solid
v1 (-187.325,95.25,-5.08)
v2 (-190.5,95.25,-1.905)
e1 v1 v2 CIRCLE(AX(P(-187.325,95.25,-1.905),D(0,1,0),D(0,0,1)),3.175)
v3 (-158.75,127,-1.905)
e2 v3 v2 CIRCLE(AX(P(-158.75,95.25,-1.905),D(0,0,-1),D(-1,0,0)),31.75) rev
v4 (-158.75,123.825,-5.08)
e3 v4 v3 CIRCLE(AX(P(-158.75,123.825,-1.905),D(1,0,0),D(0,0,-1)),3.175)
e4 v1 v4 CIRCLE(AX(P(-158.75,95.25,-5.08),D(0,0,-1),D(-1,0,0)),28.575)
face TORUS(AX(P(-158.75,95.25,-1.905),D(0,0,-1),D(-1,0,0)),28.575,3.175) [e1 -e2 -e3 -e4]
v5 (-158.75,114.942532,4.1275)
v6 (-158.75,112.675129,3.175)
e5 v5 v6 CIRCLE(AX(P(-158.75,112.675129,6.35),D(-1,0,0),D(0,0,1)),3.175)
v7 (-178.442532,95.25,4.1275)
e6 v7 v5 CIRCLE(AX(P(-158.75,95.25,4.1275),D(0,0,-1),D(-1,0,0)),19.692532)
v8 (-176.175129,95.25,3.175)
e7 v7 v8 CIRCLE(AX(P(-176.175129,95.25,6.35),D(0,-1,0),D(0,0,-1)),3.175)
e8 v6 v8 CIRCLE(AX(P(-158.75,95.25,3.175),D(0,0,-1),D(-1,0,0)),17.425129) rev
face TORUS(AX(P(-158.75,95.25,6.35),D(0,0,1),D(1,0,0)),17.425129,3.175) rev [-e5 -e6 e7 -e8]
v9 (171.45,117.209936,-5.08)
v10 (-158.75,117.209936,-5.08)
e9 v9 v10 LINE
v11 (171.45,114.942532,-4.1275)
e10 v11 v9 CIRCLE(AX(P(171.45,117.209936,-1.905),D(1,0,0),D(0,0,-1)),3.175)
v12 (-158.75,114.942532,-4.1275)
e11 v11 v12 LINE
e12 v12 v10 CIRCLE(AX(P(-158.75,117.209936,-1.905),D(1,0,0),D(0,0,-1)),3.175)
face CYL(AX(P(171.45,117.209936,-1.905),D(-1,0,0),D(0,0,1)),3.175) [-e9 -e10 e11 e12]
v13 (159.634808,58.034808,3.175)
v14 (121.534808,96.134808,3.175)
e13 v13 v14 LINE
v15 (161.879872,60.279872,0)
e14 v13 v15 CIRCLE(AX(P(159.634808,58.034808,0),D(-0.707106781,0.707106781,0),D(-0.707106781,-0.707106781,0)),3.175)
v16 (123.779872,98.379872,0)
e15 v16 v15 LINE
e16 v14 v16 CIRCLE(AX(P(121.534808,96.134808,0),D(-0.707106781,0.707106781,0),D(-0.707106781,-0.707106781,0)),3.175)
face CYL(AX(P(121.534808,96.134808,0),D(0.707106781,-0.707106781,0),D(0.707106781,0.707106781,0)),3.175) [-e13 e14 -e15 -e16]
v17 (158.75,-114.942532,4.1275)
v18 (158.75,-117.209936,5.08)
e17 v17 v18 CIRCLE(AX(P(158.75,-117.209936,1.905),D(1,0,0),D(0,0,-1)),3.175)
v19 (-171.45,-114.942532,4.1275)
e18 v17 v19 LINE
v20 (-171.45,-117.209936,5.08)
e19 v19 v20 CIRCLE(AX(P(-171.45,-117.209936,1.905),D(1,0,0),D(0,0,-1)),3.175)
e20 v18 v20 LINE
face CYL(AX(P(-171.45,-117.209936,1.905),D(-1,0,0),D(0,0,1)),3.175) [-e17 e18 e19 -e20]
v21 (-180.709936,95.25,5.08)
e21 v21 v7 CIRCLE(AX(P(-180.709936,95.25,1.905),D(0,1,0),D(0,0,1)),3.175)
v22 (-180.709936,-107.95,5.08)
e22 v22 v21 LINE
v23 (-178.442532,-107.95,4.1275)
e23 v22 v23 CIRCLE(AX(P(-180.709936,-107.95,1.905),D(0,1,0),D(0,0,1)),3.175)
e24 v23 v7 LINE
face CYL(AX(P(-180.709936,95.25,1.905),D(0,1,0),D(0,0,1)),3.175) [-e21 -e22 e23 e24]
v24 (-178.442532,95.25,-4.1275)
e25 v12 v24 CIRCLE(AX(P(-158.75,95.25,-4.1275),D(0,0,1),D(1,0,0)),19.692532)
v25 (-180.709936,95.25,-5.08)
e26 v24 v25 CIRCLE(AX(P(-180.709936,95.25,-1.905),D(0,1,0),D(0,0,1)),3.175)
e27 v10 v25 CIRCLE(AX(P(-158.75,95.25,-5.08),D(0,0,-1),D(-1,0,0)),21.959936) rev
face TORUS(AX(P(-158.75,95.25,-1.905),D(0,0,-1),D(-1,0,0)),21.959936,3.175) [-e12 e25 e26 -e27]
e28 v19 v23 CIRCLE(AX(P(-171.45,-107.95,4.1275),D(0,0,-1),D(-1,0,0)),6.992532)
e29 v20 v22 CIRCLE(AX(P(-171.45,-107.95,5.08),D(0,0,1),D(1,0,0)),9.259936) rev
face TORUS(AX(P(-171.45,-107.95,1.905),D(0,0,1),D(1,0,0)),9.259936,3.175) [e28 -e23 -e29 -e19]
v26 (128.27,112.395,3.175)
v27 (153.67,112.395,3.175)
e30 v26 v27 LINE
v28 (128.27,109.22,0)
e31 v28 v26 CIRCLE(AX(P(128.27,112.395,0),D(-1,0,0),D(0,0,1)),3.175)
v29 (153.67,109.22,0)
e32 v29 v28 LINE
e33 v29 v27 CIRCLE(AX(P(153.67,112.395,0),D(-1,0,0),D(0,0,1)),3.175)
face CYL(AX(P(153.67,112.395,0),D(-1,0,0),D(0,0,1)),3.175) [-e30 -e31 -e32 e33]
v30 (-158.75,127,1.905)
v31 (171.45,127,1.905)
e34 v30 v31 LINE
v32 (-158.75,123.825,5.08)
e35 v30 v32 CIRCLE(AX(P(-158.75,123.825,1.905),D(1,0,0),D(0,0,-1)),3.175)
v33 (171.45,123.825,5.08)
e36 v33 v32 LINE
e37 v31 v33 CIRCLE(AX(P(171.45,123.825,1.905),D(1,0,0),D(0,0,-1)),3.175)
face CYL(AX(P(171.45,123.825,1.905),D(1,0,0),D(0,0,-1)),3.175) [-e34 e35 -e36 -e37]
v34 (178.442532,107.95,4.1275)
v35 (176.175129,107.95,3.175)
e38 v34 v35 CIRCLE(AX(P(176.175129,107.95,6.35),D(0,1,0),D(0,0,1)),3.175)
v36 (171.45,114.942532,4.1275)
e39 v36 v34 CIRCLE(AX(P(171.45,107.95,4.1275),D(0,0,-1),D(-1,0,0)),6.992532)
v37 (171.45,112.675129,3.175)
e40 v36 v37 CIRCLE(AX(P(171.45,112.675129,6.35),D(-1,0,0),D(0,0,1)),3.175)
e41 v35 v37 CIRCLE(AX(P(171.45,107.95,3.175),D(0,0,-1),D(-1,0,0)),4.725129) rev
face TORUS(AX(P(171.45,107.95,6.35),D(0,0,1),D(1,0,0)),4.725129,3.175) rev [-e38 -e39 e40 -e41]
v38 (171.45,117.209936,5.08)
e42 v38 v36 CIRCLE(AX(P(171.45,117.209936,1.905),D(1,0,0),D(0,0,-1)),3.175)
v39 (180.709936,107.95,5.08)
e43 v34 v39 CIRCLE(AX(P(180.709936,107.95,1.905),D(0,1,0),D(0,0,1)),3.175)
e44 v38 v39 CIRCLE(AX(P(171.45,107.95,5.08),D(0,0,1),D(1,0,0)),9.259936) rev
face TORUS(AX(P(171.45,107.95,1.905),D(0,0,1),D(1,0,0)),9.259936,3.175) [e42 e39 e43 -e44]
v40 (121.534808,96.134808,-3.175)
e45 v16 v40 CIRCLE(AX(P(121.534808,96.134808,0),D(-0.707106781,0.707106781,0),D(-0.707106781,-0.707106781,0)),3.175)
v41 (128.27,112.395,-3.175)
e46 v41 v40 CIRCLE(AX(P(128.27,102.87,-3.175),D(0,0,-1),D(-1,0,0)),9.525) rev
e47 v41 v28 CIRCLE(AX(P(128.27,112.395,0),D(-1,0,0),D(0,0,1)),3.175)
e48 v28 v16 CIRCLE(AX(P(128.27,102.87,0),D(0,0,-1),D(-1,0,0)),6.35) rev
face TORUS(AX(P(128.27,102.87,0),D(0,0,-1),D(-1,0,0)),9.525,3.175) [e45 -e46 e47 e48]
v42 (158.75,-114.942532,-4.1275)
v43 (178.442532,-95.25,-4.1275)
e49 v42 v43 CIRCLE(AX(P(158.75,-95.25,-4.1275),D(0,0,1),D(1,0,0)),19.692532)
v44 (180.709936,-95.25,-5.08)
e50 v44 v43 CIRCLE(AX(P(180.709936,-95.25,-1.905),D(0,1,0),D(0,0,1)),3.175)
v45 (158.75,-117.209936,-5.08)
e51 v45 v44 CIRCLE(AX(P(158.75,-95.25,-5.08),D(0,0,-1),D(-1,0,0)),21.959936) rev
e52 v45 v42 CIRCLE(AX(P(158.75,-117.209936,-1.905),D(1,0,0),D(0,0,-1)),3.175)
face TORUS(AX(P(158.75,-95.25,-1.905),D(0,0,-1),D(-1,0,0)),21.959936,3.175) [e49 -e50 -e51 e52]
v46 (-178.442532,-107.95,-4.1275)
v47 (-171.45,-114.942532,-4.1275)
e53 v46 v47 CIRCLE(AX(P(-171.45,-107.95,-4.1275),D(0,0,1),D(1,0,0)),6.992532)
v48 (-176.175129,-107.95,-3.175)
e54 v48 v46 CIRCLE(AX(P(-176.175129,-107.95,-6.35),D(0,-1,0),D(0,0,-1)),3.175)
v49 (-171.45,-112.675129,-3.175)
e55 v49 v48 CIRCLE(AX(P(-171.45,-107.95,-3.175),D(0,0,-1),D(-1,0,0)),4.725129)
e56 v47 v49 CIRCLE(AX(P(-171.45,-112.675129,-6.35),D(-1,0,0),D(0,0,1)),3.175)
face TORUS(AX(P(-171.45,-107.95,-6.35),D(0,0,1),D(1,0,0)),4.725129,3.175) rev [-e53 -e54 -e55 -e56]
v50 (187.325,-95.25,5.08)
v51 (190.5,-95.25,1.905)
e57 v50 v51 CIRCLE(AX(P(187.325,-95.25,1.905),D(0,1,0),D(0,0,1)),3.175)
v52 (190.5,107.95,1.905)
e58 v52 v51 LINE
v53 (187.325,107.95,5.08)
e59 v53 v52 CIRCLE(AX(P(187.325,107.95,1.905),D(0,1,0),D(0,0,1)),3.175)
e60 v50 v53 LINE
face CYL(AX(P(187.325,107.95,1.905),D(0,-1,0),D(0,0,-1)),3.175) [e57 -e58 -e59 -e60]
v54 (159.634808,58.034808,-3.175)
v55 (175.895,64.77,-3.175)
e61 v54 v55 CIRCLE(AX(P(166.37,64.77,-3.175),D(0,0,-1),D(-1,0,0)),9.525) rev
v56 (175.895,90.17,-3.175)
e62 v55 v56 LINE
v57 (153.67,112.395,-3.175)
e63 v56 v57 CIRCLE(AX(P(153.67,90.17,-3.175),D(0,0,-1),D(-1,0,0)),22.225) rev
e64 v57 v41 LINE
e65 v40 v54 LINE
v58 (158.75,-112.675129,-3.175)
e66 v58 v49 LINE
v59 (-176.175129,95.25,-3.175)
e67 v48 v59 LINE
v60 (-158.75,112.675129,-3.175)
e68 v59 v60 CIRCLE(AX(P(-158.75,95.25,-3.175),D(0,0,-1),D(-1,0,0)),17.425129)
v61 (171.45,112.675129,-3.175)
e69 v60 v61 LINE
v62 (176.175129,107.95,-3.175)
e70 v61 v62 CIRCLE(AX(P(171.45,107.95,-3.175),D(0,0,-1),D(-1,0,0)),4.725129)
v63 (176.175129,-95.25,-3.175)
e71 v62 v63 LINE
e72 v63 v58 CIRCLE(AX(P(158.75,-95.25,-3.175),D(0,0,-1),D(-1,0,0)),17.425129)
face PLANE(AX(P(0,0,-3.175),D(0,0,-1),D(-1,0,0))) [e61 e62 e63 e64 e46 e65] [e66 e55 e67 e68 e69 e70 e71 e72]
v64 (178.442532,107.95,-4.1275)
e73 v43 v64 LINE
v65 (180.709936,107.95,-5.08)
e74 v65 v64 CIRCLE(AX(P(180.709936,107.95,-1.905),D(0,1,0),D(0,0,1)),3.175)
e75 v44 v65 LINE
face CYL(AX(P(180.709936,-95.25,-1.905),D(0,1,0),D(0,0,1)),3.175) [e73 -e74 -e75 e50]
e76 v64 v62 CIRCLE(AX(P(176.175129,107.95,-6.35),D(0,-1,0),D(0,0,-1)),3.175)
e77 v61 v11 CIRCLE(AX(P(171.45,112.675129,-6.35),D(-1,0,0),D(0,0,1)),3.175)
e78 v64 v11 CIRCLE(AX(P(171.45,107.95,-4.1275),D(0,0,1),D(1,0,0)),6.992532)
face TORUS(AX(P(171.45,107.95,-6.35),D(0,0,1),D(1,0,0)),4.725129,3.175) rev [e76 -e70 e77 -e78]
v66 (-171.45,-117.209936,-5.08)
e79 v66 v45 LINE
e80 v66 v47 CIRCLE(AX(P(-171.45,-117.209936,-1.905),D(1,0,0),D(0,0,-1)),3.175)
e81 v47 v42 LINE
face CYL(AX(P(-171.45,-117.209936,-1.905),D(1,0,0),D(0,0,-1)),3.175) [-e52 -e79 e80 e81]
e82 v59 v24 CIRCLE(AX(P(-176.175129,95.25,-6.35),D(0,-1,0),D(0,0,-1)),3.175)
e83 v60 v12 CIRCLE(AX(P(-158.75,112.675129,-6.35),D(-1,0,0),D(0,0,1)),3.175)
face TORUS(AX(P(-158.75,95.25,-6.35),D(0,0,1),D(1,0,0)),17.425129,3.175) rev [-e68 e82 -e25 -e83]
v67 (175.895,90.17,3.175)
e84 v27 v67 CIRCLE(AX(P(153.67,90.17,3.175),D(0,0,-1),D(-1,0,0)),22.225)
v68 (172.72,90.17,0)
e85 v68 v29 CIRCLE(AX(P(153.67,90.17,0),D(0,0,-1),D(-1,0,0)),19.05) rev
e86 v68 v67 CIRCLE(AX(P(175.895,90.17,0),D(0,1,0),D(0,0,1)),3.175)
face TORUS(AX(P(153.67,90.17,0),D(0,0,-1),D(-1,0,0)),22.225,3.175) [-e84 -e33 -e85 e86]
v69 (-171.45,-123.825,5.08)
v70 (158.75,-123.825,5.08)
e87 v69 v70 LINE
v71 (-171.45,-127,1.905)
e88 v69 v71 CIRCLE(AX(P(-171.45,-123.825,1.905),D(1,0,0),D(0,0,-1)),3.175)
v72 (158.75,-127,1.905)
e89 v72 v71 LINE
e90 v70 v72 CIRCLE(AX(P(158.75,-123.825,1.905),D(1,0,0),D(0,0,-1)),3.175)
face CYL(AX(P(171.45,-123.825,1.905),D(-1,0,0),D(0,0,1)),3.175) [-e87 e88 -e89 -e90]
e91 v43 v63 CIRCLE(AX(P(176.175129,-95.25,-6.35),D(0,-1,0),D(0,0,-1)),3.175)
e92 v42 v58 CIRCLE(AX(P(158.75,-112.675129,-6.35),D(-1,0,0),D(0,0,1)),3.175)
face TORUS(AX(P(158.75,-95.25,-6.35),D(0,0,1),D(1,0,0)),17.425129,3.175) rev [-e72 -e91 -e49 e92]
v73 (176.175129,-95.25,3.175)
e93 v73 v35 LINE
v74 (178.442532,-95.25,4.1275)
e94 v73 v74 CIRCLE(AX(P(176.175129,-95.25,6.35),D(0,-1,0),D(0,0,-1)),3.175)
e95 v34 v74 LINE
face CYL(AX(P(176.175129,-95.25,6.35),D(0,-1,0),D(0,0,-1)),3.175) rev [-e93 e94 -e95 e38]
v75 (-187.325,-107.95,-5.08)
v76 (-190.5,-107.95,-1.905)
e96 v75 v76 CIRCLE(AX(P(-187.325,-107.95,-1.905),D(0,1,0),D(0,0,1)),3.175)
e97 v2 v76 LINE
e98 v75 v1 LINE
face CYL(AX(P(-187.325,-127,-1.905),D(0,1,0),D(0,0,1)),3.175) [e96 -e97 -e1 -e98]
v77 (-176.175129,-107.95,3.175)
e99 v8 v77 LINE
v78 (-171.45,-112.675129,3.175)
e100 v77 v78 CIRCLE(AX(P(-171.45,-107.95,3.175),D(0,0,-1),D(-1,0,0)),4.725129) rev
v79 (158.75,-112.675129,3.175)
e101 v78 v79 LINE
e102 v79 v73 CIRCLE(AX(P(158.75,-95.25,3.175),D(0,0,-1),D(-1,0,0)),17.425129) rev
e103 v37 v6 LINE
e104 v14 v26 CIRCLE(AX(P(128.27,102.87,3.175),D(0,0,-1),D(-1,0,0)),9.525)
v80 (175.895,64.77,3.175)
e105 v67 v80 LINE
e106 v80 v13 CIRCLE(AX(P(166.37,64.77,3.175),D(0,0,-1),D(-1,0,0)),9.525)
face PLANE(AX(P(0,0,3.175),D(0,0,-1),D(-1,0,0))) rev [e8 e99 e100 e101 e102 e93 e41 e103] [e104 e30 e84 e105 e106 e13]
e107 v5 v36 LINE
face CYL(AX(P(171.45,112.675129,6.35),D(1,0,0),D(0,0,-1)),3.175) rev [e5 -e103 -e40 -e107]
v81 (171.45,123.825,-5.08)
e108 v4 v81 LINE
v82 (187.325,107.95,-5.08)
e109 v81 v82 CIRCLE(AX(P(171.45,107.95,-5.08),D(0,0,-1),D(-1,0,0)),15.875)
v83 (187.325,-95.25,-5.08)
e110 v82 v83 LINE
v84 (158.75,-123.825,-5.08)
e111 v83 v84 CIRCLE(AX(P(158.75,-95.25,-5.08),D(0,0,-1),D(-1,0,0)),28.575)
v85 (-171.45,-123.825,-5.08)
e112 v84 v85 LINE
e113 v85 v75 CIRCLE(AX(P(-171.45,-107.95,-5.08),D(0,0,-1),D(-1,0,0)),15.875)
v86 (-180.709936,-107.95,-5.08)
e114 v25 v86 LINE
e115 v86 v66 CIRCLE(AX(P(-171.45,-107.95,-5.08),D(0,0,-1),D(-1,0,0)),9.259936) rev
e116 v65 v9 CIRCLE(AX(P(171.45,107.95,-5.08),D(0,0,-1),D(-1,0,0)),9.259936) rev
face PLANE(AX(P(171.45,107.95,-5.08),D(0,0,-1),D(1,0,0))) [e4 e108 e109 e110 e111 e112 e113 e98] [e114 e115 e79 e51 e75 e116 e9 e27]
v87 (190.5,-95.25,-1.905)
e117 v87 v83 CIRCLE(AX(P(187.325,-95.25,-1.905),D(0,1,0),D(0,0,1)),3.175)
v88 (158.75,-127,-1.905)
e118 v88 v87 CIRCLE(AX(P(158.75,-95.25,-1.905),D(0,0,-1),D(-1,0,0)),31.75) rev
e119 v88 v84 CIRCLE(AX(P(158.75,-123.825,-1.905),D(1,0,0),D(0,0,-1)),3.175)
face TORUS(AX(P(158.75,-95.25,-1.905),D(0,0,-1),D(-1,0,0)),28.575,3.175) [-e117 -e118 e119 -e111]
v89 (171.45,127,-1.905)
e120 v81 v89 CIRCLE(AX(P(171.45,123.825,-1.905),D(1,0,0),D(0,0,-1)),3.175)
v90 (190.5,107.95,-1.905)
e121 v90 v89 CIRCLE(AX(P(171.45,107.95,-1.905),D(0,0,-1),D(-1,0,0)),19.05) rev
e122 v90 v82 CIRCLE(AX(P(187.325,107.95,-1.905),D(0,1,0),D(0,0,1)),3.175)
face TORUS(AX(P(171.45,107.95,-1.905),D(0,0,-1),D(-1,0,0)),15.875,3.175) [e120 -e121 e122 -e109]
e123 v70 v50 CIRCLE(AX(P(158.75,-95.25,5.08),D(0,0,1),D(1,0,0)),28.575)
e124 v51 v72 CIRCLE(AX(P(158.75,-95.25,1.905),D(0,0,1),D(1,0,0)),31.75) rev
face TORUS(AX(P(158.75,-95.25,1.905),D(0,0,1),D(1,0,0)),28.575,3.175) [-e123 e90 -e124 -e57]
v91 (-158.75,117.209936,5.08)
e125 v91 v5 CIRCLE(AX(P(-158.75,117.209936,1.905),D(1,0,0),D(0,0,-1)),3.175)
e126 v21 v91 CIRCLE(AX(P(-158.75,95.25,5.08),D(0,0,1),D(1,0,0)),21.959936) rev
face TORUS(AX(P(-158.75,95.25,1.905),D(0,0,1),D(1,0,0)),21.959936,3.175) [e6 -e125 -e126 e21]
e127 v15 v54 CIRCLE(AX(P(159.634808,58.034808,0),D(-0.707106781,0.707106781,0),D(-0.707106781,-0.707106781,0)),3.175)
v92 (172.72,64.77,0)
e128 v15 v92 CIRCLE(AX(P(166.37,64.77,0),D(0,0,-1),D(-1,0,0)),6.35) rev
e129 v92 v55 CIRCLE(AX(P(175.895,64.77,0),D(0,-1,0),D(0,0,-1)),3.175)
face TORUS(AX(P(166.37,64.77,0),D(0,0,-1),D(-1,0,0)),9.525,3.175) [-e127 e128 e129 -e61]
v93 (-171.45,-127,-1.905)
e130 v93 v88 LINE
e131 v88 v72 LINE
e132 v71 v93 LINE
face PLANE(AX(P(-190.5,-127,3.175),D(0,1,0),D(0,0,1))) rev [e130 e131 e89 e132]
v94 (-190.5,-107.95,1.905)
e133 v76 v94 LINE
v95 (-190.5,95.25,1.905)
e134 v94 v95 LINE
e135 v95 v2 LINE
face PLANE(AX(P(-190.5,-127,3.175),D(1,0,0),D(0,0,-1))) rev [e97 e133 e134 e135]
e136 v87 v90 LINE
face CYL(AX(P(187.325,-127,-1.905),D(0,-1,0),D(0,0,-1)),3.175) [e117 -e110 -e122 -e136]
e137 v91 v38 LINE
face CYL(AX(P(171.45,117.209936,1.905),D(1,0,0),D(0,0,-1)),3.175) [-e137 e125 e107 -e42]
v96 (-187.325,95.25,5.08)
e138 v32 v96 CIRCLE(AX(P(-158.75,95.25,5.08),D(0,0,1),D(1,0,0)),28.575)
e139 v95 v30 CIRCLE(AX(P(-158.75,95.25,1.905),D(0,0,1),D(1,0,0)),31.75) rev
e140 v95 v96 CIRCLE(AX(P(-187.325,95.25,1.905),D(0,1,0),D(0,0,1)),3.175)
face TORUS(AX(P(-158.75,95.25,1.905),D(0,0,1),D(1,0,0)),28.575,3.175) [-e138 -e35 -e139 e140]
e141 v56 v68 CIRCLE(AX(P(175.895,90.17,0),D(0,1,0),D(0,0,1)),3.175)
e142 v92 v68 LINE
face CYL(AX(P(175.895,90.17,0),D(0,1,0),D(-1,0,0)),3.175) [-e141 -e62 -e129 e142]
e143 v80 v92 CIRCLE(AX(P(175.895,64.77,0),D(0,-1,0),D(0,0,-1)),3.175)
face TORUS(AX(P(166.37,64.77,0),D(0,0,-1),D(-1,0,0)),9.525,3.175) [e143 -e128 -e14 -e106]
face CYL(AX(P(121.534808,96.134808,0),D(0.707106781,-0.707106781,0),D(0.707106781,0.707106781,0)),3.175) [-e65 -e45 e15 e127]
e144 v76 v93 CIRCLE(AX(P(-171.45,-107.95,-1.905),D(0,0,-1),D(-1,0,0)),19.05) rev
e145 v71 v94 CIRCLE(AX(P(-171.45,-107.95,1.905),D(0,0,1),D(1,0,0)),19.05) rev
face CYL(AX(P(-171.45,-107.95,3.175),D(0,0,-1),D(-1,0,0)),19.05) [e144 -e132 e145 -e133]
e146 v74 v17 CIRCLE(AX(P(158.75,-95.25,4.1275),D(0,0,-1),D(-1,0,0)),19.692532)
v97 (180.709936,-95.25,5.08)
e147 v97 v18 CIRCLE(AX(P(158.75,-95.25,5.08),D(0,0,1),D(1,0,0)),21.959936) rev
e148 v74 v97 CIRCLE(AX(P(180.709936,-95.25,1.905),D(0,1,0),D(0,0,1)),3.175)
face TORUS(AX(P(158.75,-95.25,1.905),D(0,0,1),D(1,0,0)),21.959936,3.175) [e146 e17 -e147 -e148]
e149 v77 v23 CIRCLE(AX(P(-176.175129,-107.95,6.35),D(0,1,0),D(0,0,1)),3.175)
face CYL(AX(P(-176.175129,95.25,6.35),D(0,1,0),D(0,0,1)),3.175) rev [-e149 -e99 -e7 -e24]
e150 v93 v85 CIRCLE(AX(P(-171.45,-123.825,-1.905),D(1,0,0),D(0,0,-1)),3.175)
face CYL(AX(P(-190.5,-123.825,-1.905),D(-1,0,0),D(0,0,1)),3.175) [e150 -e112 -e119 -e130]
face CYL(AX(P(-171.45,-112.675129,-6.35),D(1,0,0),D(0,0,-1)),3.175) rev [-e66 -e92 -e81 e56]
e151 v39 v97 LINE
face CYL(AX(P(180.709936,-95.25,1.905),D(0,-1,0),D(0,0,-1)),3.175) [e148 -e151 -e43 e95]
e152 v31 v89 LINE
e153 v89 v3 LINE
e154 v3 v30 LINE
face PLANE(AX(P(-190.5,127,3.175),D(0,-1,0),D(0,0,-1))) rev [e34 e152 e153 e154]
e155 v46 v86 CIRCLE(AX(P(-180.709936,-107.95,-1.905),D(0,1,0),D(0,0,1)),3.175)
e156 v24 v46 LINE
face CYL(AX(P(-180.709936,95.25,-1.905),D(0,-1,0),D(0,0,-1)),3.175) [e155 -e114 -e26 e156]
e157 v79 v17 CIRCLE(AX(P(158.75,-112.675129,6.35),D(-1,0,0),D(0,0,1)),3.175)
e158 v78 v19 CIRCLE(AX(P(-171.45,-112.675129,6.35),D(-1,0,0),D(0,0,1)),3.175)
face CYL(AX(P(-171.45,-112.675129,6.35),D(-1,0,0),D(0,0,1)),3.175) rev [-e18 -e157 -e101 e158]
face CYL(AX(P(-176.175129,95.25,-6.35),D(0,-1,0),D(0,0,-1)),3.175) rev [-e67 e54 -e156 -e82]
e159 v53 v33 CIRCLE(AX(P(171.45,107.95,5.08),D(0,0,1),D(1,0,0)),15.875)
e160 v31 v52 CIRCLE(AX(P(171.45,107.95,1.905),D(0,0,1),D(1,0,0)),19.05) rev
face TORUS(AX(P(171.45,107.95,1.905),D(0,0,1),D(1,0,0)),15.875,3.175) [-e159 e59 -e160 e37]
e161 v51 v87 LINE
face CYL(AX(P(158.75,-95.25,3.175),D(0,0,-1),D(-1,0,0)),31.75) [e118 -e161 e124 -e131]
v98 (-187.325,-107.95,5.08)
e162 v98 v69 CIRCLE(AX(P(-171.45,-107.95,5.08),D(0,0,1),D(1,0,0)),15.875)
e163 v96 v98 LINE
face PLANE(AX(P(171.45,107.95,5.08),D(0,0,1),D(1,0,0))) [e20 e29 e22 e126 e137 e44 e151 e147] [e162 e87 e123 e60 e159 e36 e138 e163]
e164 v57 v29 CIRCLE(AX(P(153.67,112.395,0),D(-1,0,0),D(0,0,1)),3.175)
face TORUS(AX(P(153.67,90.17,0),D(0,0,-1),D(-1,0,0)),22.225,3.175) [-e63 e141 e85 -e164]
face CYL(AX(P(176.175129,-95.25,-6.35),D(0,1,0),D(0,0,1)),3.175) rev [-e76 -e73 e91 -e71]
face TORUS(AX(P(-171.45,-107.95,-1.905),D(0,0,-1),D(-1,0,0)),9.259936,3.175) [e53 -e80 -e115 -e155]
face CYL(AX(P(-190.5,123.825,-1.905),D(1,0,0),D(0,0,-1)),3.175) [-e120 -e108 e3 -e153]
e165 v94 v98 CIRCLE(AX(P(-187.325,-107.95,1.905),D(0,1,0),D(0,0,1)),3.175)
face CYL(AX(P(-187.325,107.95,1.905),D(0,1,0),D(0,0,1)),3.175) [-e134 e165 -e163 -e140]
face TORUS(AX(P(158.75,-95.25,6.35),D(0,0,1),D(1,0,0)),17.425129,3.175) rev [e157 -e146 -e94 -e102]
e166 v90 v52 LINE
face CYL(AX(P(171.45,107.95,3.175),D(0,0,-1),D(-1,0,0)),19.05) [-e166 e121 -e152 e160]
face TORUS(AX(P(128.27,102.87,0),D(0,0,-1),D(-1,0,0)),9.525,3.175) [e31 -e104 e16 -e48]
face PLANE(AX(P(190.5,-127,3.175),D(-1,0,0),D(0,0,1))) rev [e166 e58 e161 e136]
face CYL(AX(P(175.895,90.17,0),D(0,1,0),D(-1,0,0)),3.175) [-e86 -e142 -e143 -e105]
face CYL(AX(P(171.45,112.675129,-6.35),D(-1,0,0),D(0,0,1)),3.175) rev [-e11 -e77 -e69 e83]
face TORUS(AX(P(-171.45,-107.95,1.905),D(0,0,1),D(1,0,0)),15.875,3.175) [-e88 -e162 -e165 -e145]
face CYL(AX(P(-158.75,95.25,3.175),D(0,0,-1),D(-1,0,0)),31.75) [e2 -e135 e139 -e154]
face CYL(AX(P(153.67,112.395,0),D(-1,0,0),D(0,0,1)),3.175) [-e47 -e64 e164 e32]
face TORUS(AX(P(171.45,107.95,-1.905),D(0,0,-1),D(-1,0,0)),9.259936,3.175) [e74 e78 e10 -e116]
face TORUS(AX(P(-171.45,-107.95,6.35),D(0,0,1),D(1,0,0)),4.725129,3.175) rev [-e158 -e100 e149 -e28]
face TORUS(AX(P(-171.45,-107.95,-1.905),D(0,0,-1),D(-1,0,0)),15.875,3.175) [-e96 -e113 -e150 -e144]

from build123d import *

# Parameters (mm, degrees)
SKETCH1_W           = 381
SKETCH1_H           = 254
BOSS_EXTRUDE1_DEPTH = 3.175
FILLET5_R           = 19.05
FILLET4_R           = 31.75
BOSS_EXTRUDE2_DEPTH = 1.905
CUT_EXTRUDE1_DEPTH  = 230.101276786
FILLET9_R           = 3.175
FILLET8_R           = 3.175


with BuildPart() as part:
    # Sketch1 → Boss-Extrude1 (new, symmetric)
    with BuildSketch(Plane.XY):
        Rectangle(SKETCH1_W, SKETCH1_H)
    extrude(amount=BOSS_EXTRUDE1_DEPTH, both=True)

    # Fillet5
    fillet5_edges = [part.edges().sort_by_distance(p)[0] for p in [
        (-190.5, -127, 0),
        (190.5, 127, 0),
    ]]
    fillet(fillet5_edges, radius=FILLET5_R)

    # Fillet4
    fillet4_edges = [part.edges().sort_by_distance(p)[0] for p in [
        (190.5, -127, 0),
        (-190.5, 127, 0),
    ]]
    fillet(fillet4_edges, radius=FILLET4_R)

    # Sketch2 → Boss-Extrude2 (add)
    with BuildSketch(Plane.XY.offset(3.175)):
        with BuildLine():
            Line((-171.45, -127), (158.75, -127))
            ThreePointArc((158.75, -127), (181.200640303, -117.700640303), (190.5, -95.25))
            Line((190.5, -95.25), (190.5, 107.95))
            ThreePointArc((190.5, 107.95), (184.920384182, 121.420384182), (171.45, 127))
            Line((171.45, 127), (-158.75, 127))
            ThreePointArc((-158.75, 127), (-181.200640303, 117.700640303), (-190.5, 95.25))
            Line((-190.5, 95.25), (-190.5, -107.95))
            ThreePointArc((-190.5, -107.95), (-184.920384182, -121.420384182), (-171.45, -127))
        make_face()
        with BuildLine():
            Line((-171.45, -114.3), (158.75, -114.3))
            ThreePointArc((158.75, -114.3), (172.220384182, -108.720384182), (177.8, -95.25))
            Line((177.8, -95.25), (177.8, 107.95))
            ThreePointArc((177.8, 107.95), (175.940128061, 112.440128061), (171.45, 114.3))
            Line((171.45, 114.3), (-158.75, 114.3))
            ThreePointArc((-158.75, 114.3), (-172.220384182, 108.720384182), (-177.8, 95.25))
            Line((-177.8, 95.25), (-177.8, -107.95))
            ThreePointArc((-177.8, -107.95), (-175.940128061, -112.440128061), (-171.45, -114.3))
        make_face(mode=Mode.SUBTRACT)
    boss_extrude2 = extrude(amount=BOSS_EXTRUDE2_DEPTH)

    # Mirror1: Boss-Extrude2 across plane
    add(boss_extrude2.mirror(Plane.XY))

    # Sketch3 → Cut-Extrude1 (cut, through all)
    with BuildSketch(Plane.XY.offset(3.175)):
        with BuildLine():
            Line((153.67, 109.22), (128.27, 109.22))
            ThreePointArc((128.27, 109.22), (122.403364969, 105.300039796), (123.779871939, 98.379871939))
            Line((123.779871939, 98.379871939), (161.879871939, 60.279871939))
            ThreePointArc((161.879871939, 60.279871939), (168.800039796, 58.903364969), (172.72, 64.77))
            Line((172.72, 64.77), (172.72, 90.17))
            ThreePointArc((172.72, 90.17), (167.140384182, 103.640384182), (153.67, 109.22))
        make_face()
    extrude(amount=-CUT_EXTRUDE1_DEPTH, mode=Mode.SUBTRACT)

    # Fillet9
    # the kernel refuses this fillet: 3.175 mm, written as the material it takes off along each edge
    with BuildSketch(Plane(origin=(153.67, 109.22, -3.175), x_dir=(0, 1, 0), z_dir=(-1, 0, 0)), Plane(origin=(172.72, 64.77, -3.175), x_dir=(1, 0, 0), z_dir=(0, 1, 0))) as fillet9_piece_1:
        with BuildLine():
            CenterArc((FILLET9_R, -FILLET9_R), FILLET9_R, 90, 90)
            Line((0, -FILLET9_R), (-FILLET9_R * 0.02, -FILLET9_R))
            Line((-FILLET9_R * 0.02, -FILLET9_R), (-FILLET9_R * 0.02, FILLET9_R * 0.02))
            Line((-FILLET9_R * 0.02, FILLET9_R * 0.02), (FILLET9_R, FILLET9_R * 0.02))
            Line((FILLET9_R, FILLET9_R * 0.02), (FILLET9_R, 0))
        make_face()
    extrude(amount=25.4, mode=Mode.SUBTRACT)
    with BuildSketch(Plane(origin=(128.27, 102.87, -3.175), x_dir=(0, 1, 0), z_dir=(1, 0, 0))) as fillet9_piece_2:
        with BuildLine():
            CenterArc((6.35 + FILLET9_R, FILLET9_R), FILLET9_R, 180, 90)
            Line((6.35, FILLET9_R), (6.35 - FILLET9_R * 0.02, FILLET9_R))
            Line((6.35 - FILLET9_R * 0.02, FILLET9_R), (6.35 - FILLET9_R * 0.02, -FILLET9_R * 0.02))
            Line((6.35 - FILLET9_R * 0.02, -FILLET9_R * 0.02), (6.35 + FILLET9_R, -FILLET9_R * 0.02))
            Line((6.35 + FILLET9_R, -FILLET9_R * 0.02), (6.35 + FILLET9_R, 0))
        make_face()
    revolve(axis=Axis((128.27, 102.87, -3.175), (0, 0, 1)), revolution_arc=135, mode=Mode.SUBTRACT)
    with BuildSketch(Plane(origin=(123.779871939, 98.379871939, -3.175), x_dir=(-0.7071067811865436, -0.7071067811865515, 0), z_dir=(0.7071067811865515, -0.7071067811865436, 0))) as fillet9_piece_3:
        with BuildLine():
            CenterArc((FILLET9_R, -FILLET9_R), FILLET9_R, 90, 90)
            Line((0, -FILLET9_R), (-FILLET9_R * 0.02, -FILLET9_R))
            Line((-FILLET9_R * 0.02, -FILLET9_R), (-FILLET9_R * 0.02, FILLET9_R * 0.02))
            Line((-FILLET9_R * 0.02, FILLET9_R * 0.02), (FILLET9_R, FILLET9_R * 0.02))
            Line((FILLET9_R, FILLET9_R * 0.02), (FILLET9_R, 0))
        make_face()
    extrude(amount=53.881536726, mode=Mode.SUBTRACT)
    with BuildSketch(Plane(origin=(166.37, 64.77, -3.175), x_dir=(-0.7071067811865369, -0.7071067811865581, 0), z_dir=(-0.7071067811865581, 0.7071067811865369, 0))) as fillet9_piece_4:
        with BuildLine():
            CenterArc((6.35 + FILLET9_R, FILLET9_R), FILLET9_R, 180, 90)
            Line((6.35, FILLET9_R), (6.35 - FILLET9_R * 0.02, FILLET9_R))
            Line((6.35 - FILLET9_R * 0.02, FILLET9_R), (6.35 - FILLET9_R * 0.02, -FILLET9_R * 0.02))
            Line((6.35 - FILLET9_R * 0.02, -FILLET9_R * 0.02), (6.35 + FILLET9_R, -FILLET9_R * 0.02))
            Line((6.35 + FILLET9_R, -FILLET9_R * 0.02), (6.35 + FILLET9_R, 0))
        make_face()
    revolve(axis=Axis((166.37, 64.77, -3.175), (0, 0, 1)), revolution_arc=135, mode=Mode.SUBTRACT)
    with BuildSketch(Plane(origin=(153.67, 90.17, -3.175), x_dir=(1, 0, 0), z_dir=(0, -1, 0))) as fillet9_piece_5:
        with BuildLine():
            CenterArc((19.05 + FILLET9_R, FILLET9_R), FILLET9_R, 180, 90)
            Line((19.05, FILLET9_R), (19.05 - FILLET9_R * 0.02, FILLET9_R))
            Line((19.05 - FILLET9_R * 0.02, FILLET9_R), (19.05 - FILLET9_R * 0.02, -FILLET9_R * 0.02))
            Line((19.05 - FILLET9_R * 0.02, -FILLET9_R * 0.02), (19.05 + FILLET9_R, -FILLET9_R * 0.02))
            Line((19.05 + FILLET9_R, -FILLET9_R * 0.02), (19.05 + FILLET9_R, 0))
        make_face()
    revolve(axis=Axis((153.67, 90.17, -3.175), (0, 0, 1)), revolution_arc=90, mode=Mode.SUBTRACT)
    with BuildSketch(Plane(origin=(153.67, 90.17, 3.175), x_dir=(1, 0, 0), z_dir=(0, -1, 0))) as fillet9_piece_6:
        with BuildLine():
            CenterArc((19.05 + FILLET9_R, -FILLET9_R), FILLET9_R, 90, 90)
            Line((19.05, -FILLET9_R), (19.05 - FILLET9_R * 0.02, -FILLET9_R))
            Line((19.05 - FILLET9_R * 0.02, -FILLET9_R), (19.05 - FILLET9_R * 0.02, FILLET9_R * 0.02))
            Line((19.05 - FILLET9_R * 0.02, FILLET9_R * 0.02), (19.05 + FILLET9_R, FILLET9_R * 0.02))
            Line((19.05 + FILLET9_R, FILLET9_R * 0.02), (19.05 + FILLET9_R, 0))
        make_face()
    revolve(axis=Axis((153.67, 90.17, 3.175), (0, 0, 1)), revolution_arc=90, mode=Mode.SUBTRACT)
    with BuildSketch(Plane(origin=(153.67, 109.22, 3.175), x_dir=(0, 1, 0), z_dir=(-1, 0, 0)), Plane(origin=(172.72, 64.77, 3.175), x_dir=(1, 0, 0), z_dir=(0, 1, 0))) as fillet9_piece_7:
        with BuildLine():
            CenterArc((FILLET9_R, FILLET9_R), FILLET9_R, 180, 90)
            Line((0, FILLET9_R), (-FILLET9_R * 0.02, FILLET9_R))
            Line((-FILLET9_R * 0.02, FILLET9_R), (-FILLET9_R * 0.02, -FILLET9_R * 0.02))
            Line((-FILLET9_R * 0.02, -FILLET9_R * 0.02), (FILLET9_R, -FILLET9_R * 0.02))
            Line((FILLET9_R, -FILLET9_R * 0.02), (FILLET9_R, 0))
        make_face()
    extrude(amount=25.4, mode=Mode.SUBTRACT)
    with BuildSketch(Plane(origin=(128.27, 102.87, 3.175), x_dir=(0, 1, 0), z_dir=(1, 0, 0))) as fillet9_piece_8:
        with BuildLine():
            CenterArc((6.35 + FILLET9_R, -FILLET9_R), FILLET9_R, 90, 90)
            Line((6.35, -FILLET9_R), (6.35 - FILLET9_R * 0.02, -FILLET9_R))
            Line((6.35 - FILLET9_R * 0.02, -FILLET9_R), (6.35 - FILLET9_R * 0.02, FILLET9_R * 0.02))
            Line((6.35 - FILLET9_R * 0.02, FILLET9_R * 0.02), (6.35 + FILLET9_R, FILLET9_R * 0.02))
            Line((6.35 + FILLET9_R, FILLET9_R * 0.02), (6.35 + FILLET9_R, 0))
        make_face()
    revolve(axis=Axis((128.27, 102.87, 3.175), (0, 0, 1)), revolution_arc=135, mode=Mode.SUBTRACT)
    with BuildSketch(Plane(origin=(123.779871939, 98.379871939, 3.175), x_dir=(-0.7071067811865436, -0.7071067811865515, 0), z_dir=(0.7071067811865515, -0.7071067811865436, 0))) as fillet9_piece_9:
        with BuildLine():
            CenterArc((FILLET9_R, FILLET9_R), FILLET9_R, 180, 90)
            Line((0, FILLET9_R), (-FILLET9_R * 0.02, FILLET9_R))
            Line((-FILLET9_R * 0.02, FILLET9_R), (-FILLET9_R * 0.02, -FILLET9_R * 0.02))
            Line((-FILLET9_R * 0.02, -FILLET9_R * 0.02), (FILLET9_R, -FILLET9_R * 0.02))
            Line((FILLET9_R, -FILLET9_R * 0.02), (FILLET9_R, 0))
        make_face()
    extrude(amount=53.881536726, mode=Mode.SUBTRACT)
    with BuildSketch(Plane(origin=(166.37, 64.77, 3.175), x_dir=(-0.7071067811865369, -0.7071067811865581, 0), z_dir=(-0.7071067811865581, 0.7071067811865369, 0))) as fillet9_piece_10:
        with BuildLine():
            CenterArc((6.35 + FILLET9_R, -FILLET9_R), FILLET9_R, 90, 90)
            Line((6.35, -FILLET9_R), (6.35 - FILLET9_R * 0.02, -FILLET9_R))
            Line((6.35 - FILLET9_R * 0.02, -FILLET9_R), (6.35 - FILLET9_R * 0.02, FILLET9_R * 0.02))
            Line((6.35 - FILLET9_R * 0.02, FILLET9_R * 0.02), (6.35 + FILLET9_R, FILLET9_R * 0.02))
            Line((6.35 + FILLET9_R, FILLET9_R * 0.02), (6.35 + FILLET9_R, 0))
        make_face()
    revolve(axis=Axis((166.37, 64.77, 3.175), (0, 0, 1)), revolution_arc=135, mode=Mode.SUBTRACT)
    with BuildSketch(Plane(origin=(171.45, 107.95, 5.08), x_dir=(1, 0, 0), z_dir=(0, -1, 0))) as fillet9_piece_11:
        with BuildLine():
            CenterArc((19.05 - FILLET9_R, -FILLET9_R), FILLET9_R, 0, 90)
            Line((19.05, -FILLET9_R), (19.05 + FILLET9_R * 0.02, -FILLET9_R))
            Line((19.05 + FILLET9_R * 0.02, -FILLET9_R), (19.05 + FILLET9_R * 0.02, FILLET9_R * 0.02))
            Line((19.05 + FILLET9_R * 0.02, FILLET9_R * 0.02), (19.05 - FILLET9_R, FILLET9_R * 0.02))
            Line((19.05 - FILLET9_R, FILLET9_R * 0.02), (19.05 - FILLET9_R, 0))
        make_face()
    revolve(axis=Axis((171.45, 107.95, 5.08), (0, 0, 1)), revolution_arc=90, mode=Mode.SUBTRACT)
    with BuildSketch(Plane(origin=(171.45, 127, 5.08), x_dir=(0, -1, 0), z_dir=(-1, 0, 0)), Plane(origin=(-171.45, -127, -5.08), x_dir=(0, 0, 1), z_dir=(1, 0, 0))) as fillet9_piece_12:
        with BuildLine():
            CenterArc((FILLET9_R, -FILLET9_R), FILLET9_R, 90, 90)
            Line((0, -FILLET9_R), (-FILLET9_R * 0.02, -FILLET9_R))
            Line((-FILLET9_R * 0.02, -FILLET9_R), (-FILLET9_R * 0.02, FILLET9_R * 0.02))
            Line((-FILLET9_R * 0.02, FILLET9_R * 0.02), (FILLET9_R, FILLET9_R * 0.02))
            Line((FILLET9_R, FILLET9_R * 0.02), (FILLET9_R, 0))
        make_face()
    extrude(amount=330.2, mode=Mode.SUBTRACT)
    with BuildSketch(Plane(origin=(-158.75, 95.25, 5.08), x_dir=(0, 1, 0), z_dir=(1, 0, 0))) as fillet9_piece_13:
        with BuildLine():
            CenterArc((31.75 - FILLET9_R, -FILLET9_R), FILLET9_R, 0, 90)
            Line((31.75, -FILLET9_R), (31.75 + FILLET9_R * 0.02, -FILLET9_R))
            Line((31.75 + FILLET9_R * 0.02, -FILLET9_R), (31.75 + FILLET9_R * 0.02, FILLET9_R * 0.02))
            Line((31.75 + FILLET9_R * 0.02, FILLET9_R * 0.02), (31.75 - FILLET9_R, FILLET9_R * 0.02))
            Line((31.75 - FILLET9_R, FILLET9_R * 0.02), (31.75 - FILLET9_R, 0))
        make_face()
    revolve(axis=Axis((-158.75, 95.25, 5.08), (0, 0, 1)), revolution_arc=90, mode=Mode.SUBTRACT)
    with BuildSketch(Plane(origin=(-190.5, 95.25, 5.08), x_dir=(1, 0, 0), z_dir=(0, -1, 0)), Plane(origin=(190.5, -95.25, 5.08), x_dir=(-1, 0, 0), z_dir=(0, 1, 0))) as fillet9_piece_14:
        with BuildLine():
            CenterArc((FILLET9_R, -FILLET9_R), FILLET9_R, 90, 90)
            Line((0, -FILLET9_R), (-FILLET9_R * 0.02, -FILLET9_R))
            Line((-FILLET9_R * 0.02, -FILLET9_R), (-FILLET9_R * 0.02, FILLET9_R * 0.02))
            Line((-FILLET9_R * 0.02, FILLET9_R * 0.02), (FILLET9_R, FILLET9_R * 0.02))
            Line((FILLET9_R, FILLET9_R * 0.02), (FILLET9_R, 0))
        make_face()
    extrude(amount=203.2, mode=Mode.SUBTRACT)
    with BuildSketch(Plane(origin=(-171.45, -107.95, 5.08), x_dir=(-1, 0, 0), z_dir=(0, 1, 0))) as fillet9_piece_15:
        with BuildLine():
            CenterArc((19.05 - FILLET9_R, -FILLET9_R), FILLET9_R, 0, 90)
            Line((19.05, -FILLET9_R), (19.05 + FILLET9_R * 0.02, -FILLET9_R))
            Line((19.05 + FILLET9_R * 0.02, -FILLET9_R), (19.05 + FILLET9_R * 0.02, FILLET9_R * 0.02))
            Line((19.05 + FILLET9_R * 0.02, FILLET9_R * 0.02), (19.05 - FILLET9_R, FILLET9_R * 0.02))
            Line((19.05 - FILLET9_R, FILLET9_R * 0.02), (19.05 - FILLET9_R, 0))
        make_face()
    revolve(axis=Axis((-171.45, -107.95, 5.08), (0, 0, 1)), revolution_arc=90, mode=Mode.SUBTRACT)
    with BuildSketch(Plane(origin=(-171.45, -127, 5.08), x_dir=(0, 0, -1), z_dir=(1, 0, 0)), Plane(origin=(171.45, 127, -5.08), x_dir=(0, -1, 0), z_dir=(-1, 0, 0))) as fillet9_piece_16:
        with BuildLine():
            CenterArc((FILLET9_R, FILLET9_R), FILLET9_R, 180, 90)
            Line((0, FILLET9_R), (-FILLET9_R * 0.02, FILLET9_R))
            Line((-FILLET9_R * 0.02, FILLET9_R), (-FILLET9_R * 0.02, -FILLET9_R * 0.02))
            Line((-FILLET9_R * 0.02, -FILLET9_R * 0.02), (FILLET9_R, -FILLET9_R * 0.02))
            Line((FILLET9_R, -FILLET9_R * 0.02), (FILLET9_R, 0))
        make_face()
    extrude(amount=330.2, mode=Mode.SUBTRACT)
    with BuildSketch(Plane(origin=(158.75, -95.25, 5.08), x_dir=(0, -1, 0), z_dir=(-1, 0, 0))) as fillet9_piece_17:
        with BuildLine():
            CenterArc((31.75 - FILLET9_R, -FILLET9_R), FILLET9_R, 0, 90)
            Line((31.75, -FILLET9_R), (31.75 + FILLET9_R * 0.02, -FILLET9_R))
            Line((31.75 + FILLET9_R * 0.02, -FILLET9_R), (31.75 + FILLET9_R * 0.02, FILLET9_R * 0.02))
            Line((31.75 + FILLET9_R * 0.02, FILLET9_R * 0.02), (31.75 - FILLET9_R, FILLET9_R * 0.02))
            Line((31.75 - FILLET9_R, FILLET9_R * 0.02), (31.75 - FILLET9_R, 0))
        make_face()
    revolve(axis=Axis((158.75, -95.25, 5.08), (0, 0, 1)), revolution_arc=90, mode=Mode.SUBTRACT)
    with BuildSketch(Plane(origin=(171.45, 107.95, -5.08), x_dir=(1, 0, 0), z_dir=(0, -1, 0))) as fillet9_piece_18:
        with BuildLine():
            CenterArc((19.05 - FILLET9_R, FILLET9_R), FILLET9_R, 270, 90)
            Line((19.05, FILLET9_R), (19.05 + FILLET9_R * 0.02, FILLET9_R))
            Line((19.05 + FILLET9_R * 0.02, FILLET9_R), (19.05 + FILLET9_R * 0.02, -FILLET9_R * 0.02))
            Line((19.05 + FILLET9_R * 0.02, -FILLET9_R * 0.02), (19.05 - FILLET9_R, -FILLET9_R * 0.02))
            Line((19.05 - FILLET9_R, -FILLET9_R * 0.02), (19.05 - FILLET9_R, 0))
        make_face()
    revolve(axis=Axis((171.45, 107.95, -5.08), (0, 0, 1)), revolution_arc=90, mode=Mode.SUBTRACT)
    with BuildSketch(Plane(origin=(190.5, -95.25, -5.08), x_dir=(-1, 0, 0), z_dir=(0, 1, 0)), Plane(origin=(-190.5, 95.25, -5.08), x_dir=(1, 0, 0), z_dir=(0, -1, 0))) as fillet9_piece_19:
        with BuildLine():
            CenterArc((FILLET9_R, FILLET9_R), FILLET9_R, 180, 90)
            Line((0, FILLET9_R), (-FILLET9_R * 0.02, FILLET9_R))
            Line((-FILLET9_R * 0.02, FILLET9_R), (-FILLET9_R * 0.02, -FILLET9_R * 0.02))
            Line((-FILLET9_R * 0.02, -FILLET9_R * 0.02), (FILLET9_R, -FILLET9_R * 0.02))
            Line((FILLET9_R, -FILLET9_R * 0.02), (FILLET9_R, 0))
        make_face()
    extrude(amount=203.2, mode=Mode.SUBTRACT)
    with BuildSketch(Plane(origin=(158.75, -95.25, -5.08), x_dir=(0, -1, 0), z_dir=(-1, 0, 0))) as fillet9_piece_20:
        with BuildLine():
            CenterArc((31.75 - FILLET9_R, FILLET9_R), FILLET9_R, 270, 90)
            Line((31.75, FILLET9_R), (31.75 + FILLET9_R * 0.02, FILLET9_R))
            Line((31.75 + FILLET9_R * 0.02, FILLET9_R), (31.75 + FILLET9_R * 0.02, -FILLET9_R * 0.02))
            Line((31.75 + FILLET9_R * 0.02, -FILLET9_R * 0.02), (31.75 - FILLET9_R, -FILLET9_R * 0.02))
            Line((31.75 - FILLET9_R, -FILLET9_R * 0.02), (31.75 - FILLET9_R, 0))
        make_face()
    revolve(axis=Axis((158.75, -95.25, -5.08), (0, 0, 1)), revolution_arc=90, mode=Mode.SUBTRACT)
    with BuildSketch(Plane(origin=(-171.45, -107.95, -5.08), x_dir=(-1, 0, 0), z_dir=(0, 1, 0))) as fillet9_piece_21:
        with BuildLine():
            CenterArc((19.05 - FILLET9_R, FILLET9_R), FILLET9_R, 270, 90)
            Line((19.05 - FILLET9_R, 0), (19.05 - FILLET9_R, -FILLET9_R * 0.02))
            Line((19.05 - FILLET9_R, -FILLET9_R * 0.02), (19.05 + FILLET9_R * 0.02, -FILLET9_R * 0.02))
            Line((19.05 + FILLET9_R * 0.02, -FILLET9_R * 0.02), (19.05 + FILLET9_R * 0.02, FILLET9_R))
            Line((19.05 + FILLET9_R * 0.02, FILLET9_R), (19.05, FILLET9_R))
        make_face()
    revolve(axis=Axis((-171.45, -107.95, -5.08), (0, 0, 1)), revolution_arc=90, mode=Mode.SUBTRACT)
    with BuildSketch(Plane(origin=(-158.75, 95.25, -5.08), x_dir=(0, 1, 0), z_dir=(1, 0, 0))) as fillet9_piece_22:
        with BuildLine():
            CenterArc((31.75 - FILLET9_R, FILLET9_R), FILLET9_R, 270, 90)
            Line((31.75, FILLET9_R), (31.75 + FILLET9_R * 0.02, FILLET9_R))
            Line((31.75 + FILLET9_R * 0.02, FILLET9_R), (31.75 + FILLET9_R * 0.02, -FILLET9_R * 0.02))
            Line((31.75 + FILLET9_R * 0.02, -FILLET9_R * 0.02), (31.75 - FILLET9_R, -FILLET9_R * 0.02))
            Line((31.75 - FILLET9_R, -FILLET9_R * 0.02), (31.75 - FILLET9_R, 0))
        make_face()
    revolve(axis=Axis((-158.75, 95.25, -5.08), (0, 0, 1)), revolution_arc=90, mode=Mode.SUBTRACT)
    with BuildSketch(Plane(origin=(171.45, 107.95, 5.08), x_dir=(1, 0, 0), z_dir=(0, -1, 0))) as fillet9_piece_23:
        with BuildLine():
            CenterArc((9.259935566, -3.175), FILLET9_R, 90, 66.421821522)
            Line((6.35, -1.905), (6.291801289, -1.8796))
            ThreePointArc((6.291801289, -1.8796), (6.2865, -0.9525), (6.2865, 0))
            Line((6.2865, 0), (6.35, 0.0635))
            Line((6.35, 0.0635), (9.259935566, 0.0635))
            Line((9.259935566, 0.0635), (9.259935566, 0))
        make_face()
    revolve(axis=Axis((171.45, 107.95, 5.08), (0, 0, 1)), revolution_arc=90, mode=Mode.SUBTRACT)
    with BuildSketch(Plane(origin=(171.45, 114.3, 5.08), x_dir=(0, 1, 0), z_dir=(-1, 0, 0)), Plane(origin=(-171.45, -114.3, 5.08), x_dir=(0, -1, 0), z_dir=(1, 0, 0))) as fillet9_piece_24:
        with BuildLine():
            CenterArc((2.909935566, 3.175), FILLET9_R, 203.578178478, 66.421821522)
            Line((0, 1.905), (-0.058198711, 1.8796))
            ThreePointArc((-0.058198711, 1.8796), (-0.0635, 0.9525), (-0.0635, 0))
            Line((-0.0635, 0), (0, -0.0635))
            Line((0, -0.0635), (2.909935566, -0.0635))
            Line((2.909935566, -0.0635), (2.909935566, 0))
        make_face()
    extrude(amount=330.2, mode=Mode.SUBTRACT)
    with BuildSketch(Plane(origin=(-158.75, 95.25, 5.08), x_dir=(0, 1, 0), z_dir=(1, 0, 0))) as fillet9_piece_25:
        with BuildLine():
            CenterArc((21.959935566, -3.175), FILLET9_R, 90, 66.421821522)
            Line((19.05, -1.905), (18.991801289, -1.8796))
            ThreePointArc((18.991801289, -1.8796), (18.9865, -0.9525), (18.9865, 0))
            Line((18.9865, 0), (19.05, 0.0635))
            Line((19.05, 0.0635), (21.959935566, 0.0635))
            Line((21.959935566, 0.0635), (21.959935566, 0))
        make_face()
    revolve(axis=Axis((-158.75, 95.25, 5.08), (0, 0, 1)), revolution_arc=90, mode=Mode.SUBTRACT)
    with BuildSketch(Plane(origin=(-177.8, 95.25, 5.08), x_dir=(-1, 0, 0), z_dir=(0, -1, 0)), Plane(origin=(177.8, -95.25, 5.08), x_dir=(1, 0, 0), z_dir=(0, 1, 0))) as fillet9_piece_26:
        with BuildLine():
            CenterArc((2.909935566, 3.175), FILLET9_R, 203.578178478, 66.421821522)
            Line((0, 1.905), (-0.058198711, 1.8796))
            ThreePointArc((-0.058198711, 1.8796), (-0.0635, 0.9525), (-0.0635, 0))
            Line((-0.0635, 0), (0, -0.0635))
            Line((0, -0.0635), (2.909935566, -0.0635))
            Line((2.909935566, -0.0635), (2.909935566, 0))
        make_face()
    extrude(amount=203.2, mode=Mode.SUBTRACT)
    with BuildSketch(Plane(origin=(-171.45, -107.95, 5.08), x_dir=(-1, 0, 0), z_dir=(0, 1, 0))) as fillet9_piece_27:
        with BuildLine():
            CenterArc((9.259935566, -3.175), FILLET9_R, 90, 66.421821522)
            Line((6.35, -1.905), (6.291801289, -1.8796))
            ThreePointArc((6.291801289, -1.8796), (6.2865, -0.9525), (6.2865, 0))
            Line((6.2865, 0), (6.35, 0.0635))
            Line((6.35, 0.0635), (9.259935566, 0.0635))
            Line((9.259935566, 0.0635), (9.259935566, 0))
        make_face()
    revolve(axis=Axis((-171.45, -107.95, 5.08), (0, 0, 1)), revolution_arc=90, mode=Mode.SUBTRACT)
    with BuildSketch(Plane(origin=(158.75, -95.25, 5.08), x_dir=(0, -1, 0), z_dir=(-1, 0, 0))) as fillet9_piece_28:
        with BuildLine():
            CenterArc((21.959935566, -3.175), FILLET9_R, 90, 66.421821522)
            Line((19.05, -1.905), (18.991801289, -1.8796))
            ThreePointArc((18.991801289, -1.8796), (18.9865, -0.9525), (18.9865, 0))
            Line((18.9865, 0), (19.05, 0.0635))
            Line((19.05, 0.0635), (21.959935566, 0.0635))
            Line((21.959935566, 0.0635), (21.959935566, 0))
        make_face()
    revolve(axis=Axis((158.75, -95.25, 5.08), (0, 0, 1)), revolution_arc=90, mode=Mode.SUBTRACT)
    with BuildSketch(Plane(origin=(171.45, 107.95, -5.08), x_dir=(1, 0, 0), z_dir=(0, -1, 0))) as fillet9_piece_29:
        with BuildLine():
            CenterArc((9.259935566, 3.175), FILLET9_R, 203.578178478, 66.421821522)
            Line((6.35, 1.905), (6.291801289, 1.8796))
            ThreePointArc((6.291801289, 1.8796), (6.2865, 0.9525), (6.2865, 0))
            Line((6.2865, 0), (6.35, -0.0635))
            Line((6.35, -0.0635), (9.259935566, -0.0635))
            Line((9.259935566, -0.0635), (9.259935566, 0))
        make_face()
    revolve(axis=Axis((171.45, 107.95, -5.08), (0, 0, 1)), revolution_arc=90, mode=Mode.SUBTRACT)
    with BuildSketch(Plane(origin=(171.45, 114.3, -5.08), x_dir=(0, 1, 0), z_dir=(-1, 0, 0)), Plane(origin=(-171.45, -114.3, -5.08), x_dir=(0, -1, 0), z_dir=(1, 0, 0))) as fillet9_piece_30:
        with BuildLine():
            CenterArc((2.909935566, -3.175), FILLET9_R, 90, 66.421821522)
            Line((0, -1.905), (-0.058198711, -1.8796))
            ThreePointArc((-0.058198711, -1.8796), (-0.0635, -0.9525), (-0.0635, 0))
            Line((-0.0635, 0), (0, 0.0635))
            Line((0, 0.0635), (2.909935566, 0.0635))
            Line((2.909935566, 0.0635), (2.909935566, 0))
        make_face()
    extrude(amount=330.2, mode=Mode.SUBTRACT)
    with BuildSketch(Plane(origin=(-158.75, 95.25, -5.08), x_dir=(0, 1, 0), z_dir=(1, 0, 0))) as fillet9_piece_31:
        with BuildLine():
            CenterArc((21.959935566, 3.175), FILLET9_R, 203.578178478, 66.421821522)
            Line((19.05, 1.905), (18.991801289, 1.8796))
            ThreePointArc((18.991801289, 1.8796), (18.9865, 0.9525), (18.9865, 0))
            Line((18.9865, 0), (19.05, -0.0635))
            Line((19.05, -0.0635), (21.959935566, -0.0635))
            Line((21.959935566, -0.0635), (21.959935566, 0))
        make_face()
    revolve(axis=Axis((-158.75, 95.25, -5.08), (0, 0, 1)), revolution_arc=90, mode=Mode.SUBTRACT)
    with BuildSketch(Plane(origin=(-177.8, 95.25, -5.08), x_dir=(-1, 0, 0), z_dir=(0, -1, 0)), Plane(origin=(177.8, -95.25, -5.08), x_dir=(1, 0, 0), z_dir=(0, 1, 0))) as fillet9_piece_32:
        with BuildLine():
            CenterArc((2.909935566, -3.175), FILLET9_R, 90, 66.421821522)
            Line((0, -1.905), (-0.058198711, -1.8796))
            ThreePointArc((-0.058198711, -1.8796), (-0.0635, -0.9525), (-0.0635, 0))
            Line((-0.0635, 0), (0, 0.0635))
            Line((0, 0.0635), (2.909935566, 0.0635))
            Line((2.909935566, 0.0635), (2.909935566, 0))
        make_face()
    extrude(amount=203.2, mode=Mode.SUBTRACT)
    with BuildSketch(Plane(origin=(-171.45, -107.95, -5.08), x_dir=(-1, 0, 0), z_dir=(0, 1, 0))) as fillet9_piece_33:
        with BuildLine():
            CenterArc((9.259935566, 3.175), FILLET9_R, 203.578178478, 66.421821522)
            Line((6.35, 1.905), (6.291801289, 1.8796))
            ThreePointArc((6.291801289, 1.8796), (6.2865, 0.9525), (6.2865, 0))
            Line((6.2865, 0), (6.35, -0.0635))
            Line((6.35, -0.0635), (9.259935566, -0.0635))
            Line((9.259935566, -0.0635), (9.259935566, 0))
        make_face()
    revolve(axis=Axis((-171.45, -107.95, -5.08), (0, 0, 1)), revolution_arc=90, mode=Mode.SUBTRACT)
    with BuildSketch(Plane(origin=(158.75, -95.25, -5.08), x_dir=(0, -1, 0), z_dir=(-1, 0, 0))) as fillet9_piece_34:
        with BuildLine():
            CenterArc((21.959935566, 3.175), FILLET9_R, 203.578178478, 66.421821522)
            Line((19.05, 1.905), (18.991801289, 1.8796))
            ThreePointArc((18.991801289, 1.8796), (18.9865, 0.9525), (18.9865, 0))
            Line((18.9865, 0), (19.05, -0.0635))
            Line((19.05, -0.0635), (21.959935566, -0.0635))
            Line((21.959935566, -0.0635), (21.959935566, 0))
        make_face()
    revolve(axis=Axis((158.75, -95.25, -5.08), (0, 0, 1)), revolution_arc=90, mode=Mode.SUBTRACT)

    # Fillet8
    fillet8_edges = [part.edges().sort_by_distance(p)[0] for p in [
        (6.35, 114.3, -3.175),
        (175.940128061, 112.440128061, 3.175),
        (6.35, 114.3, 3.175),
        (-172.220384182, 108.720384182, 3.175),
        (-177.8, -6.35, 3.175),
        (-175.940128061, -112.440128061, 3.175),
        (-6.35, -114.3, 3.175),
        (172.220384182, -108.720384182, 3.175),
        (177.8, 6.35, 3.175),
        (175.940128061, 112.440128061, -3.175),
        (177.8, 6.35, -3.175),
        (172.220384182, -108.720384182, -3.175),
        (-6.35, -114.3, -3.175),
        (-175.940128061, -112.440128061, -3.175),
        (-177.8, -6.35, -3.175),
        (-172.220384182, 108.720384182, -3.175),
    ]]
    fillet(fillet8_edges, radius=FILLET8_R)


solid = part.part
